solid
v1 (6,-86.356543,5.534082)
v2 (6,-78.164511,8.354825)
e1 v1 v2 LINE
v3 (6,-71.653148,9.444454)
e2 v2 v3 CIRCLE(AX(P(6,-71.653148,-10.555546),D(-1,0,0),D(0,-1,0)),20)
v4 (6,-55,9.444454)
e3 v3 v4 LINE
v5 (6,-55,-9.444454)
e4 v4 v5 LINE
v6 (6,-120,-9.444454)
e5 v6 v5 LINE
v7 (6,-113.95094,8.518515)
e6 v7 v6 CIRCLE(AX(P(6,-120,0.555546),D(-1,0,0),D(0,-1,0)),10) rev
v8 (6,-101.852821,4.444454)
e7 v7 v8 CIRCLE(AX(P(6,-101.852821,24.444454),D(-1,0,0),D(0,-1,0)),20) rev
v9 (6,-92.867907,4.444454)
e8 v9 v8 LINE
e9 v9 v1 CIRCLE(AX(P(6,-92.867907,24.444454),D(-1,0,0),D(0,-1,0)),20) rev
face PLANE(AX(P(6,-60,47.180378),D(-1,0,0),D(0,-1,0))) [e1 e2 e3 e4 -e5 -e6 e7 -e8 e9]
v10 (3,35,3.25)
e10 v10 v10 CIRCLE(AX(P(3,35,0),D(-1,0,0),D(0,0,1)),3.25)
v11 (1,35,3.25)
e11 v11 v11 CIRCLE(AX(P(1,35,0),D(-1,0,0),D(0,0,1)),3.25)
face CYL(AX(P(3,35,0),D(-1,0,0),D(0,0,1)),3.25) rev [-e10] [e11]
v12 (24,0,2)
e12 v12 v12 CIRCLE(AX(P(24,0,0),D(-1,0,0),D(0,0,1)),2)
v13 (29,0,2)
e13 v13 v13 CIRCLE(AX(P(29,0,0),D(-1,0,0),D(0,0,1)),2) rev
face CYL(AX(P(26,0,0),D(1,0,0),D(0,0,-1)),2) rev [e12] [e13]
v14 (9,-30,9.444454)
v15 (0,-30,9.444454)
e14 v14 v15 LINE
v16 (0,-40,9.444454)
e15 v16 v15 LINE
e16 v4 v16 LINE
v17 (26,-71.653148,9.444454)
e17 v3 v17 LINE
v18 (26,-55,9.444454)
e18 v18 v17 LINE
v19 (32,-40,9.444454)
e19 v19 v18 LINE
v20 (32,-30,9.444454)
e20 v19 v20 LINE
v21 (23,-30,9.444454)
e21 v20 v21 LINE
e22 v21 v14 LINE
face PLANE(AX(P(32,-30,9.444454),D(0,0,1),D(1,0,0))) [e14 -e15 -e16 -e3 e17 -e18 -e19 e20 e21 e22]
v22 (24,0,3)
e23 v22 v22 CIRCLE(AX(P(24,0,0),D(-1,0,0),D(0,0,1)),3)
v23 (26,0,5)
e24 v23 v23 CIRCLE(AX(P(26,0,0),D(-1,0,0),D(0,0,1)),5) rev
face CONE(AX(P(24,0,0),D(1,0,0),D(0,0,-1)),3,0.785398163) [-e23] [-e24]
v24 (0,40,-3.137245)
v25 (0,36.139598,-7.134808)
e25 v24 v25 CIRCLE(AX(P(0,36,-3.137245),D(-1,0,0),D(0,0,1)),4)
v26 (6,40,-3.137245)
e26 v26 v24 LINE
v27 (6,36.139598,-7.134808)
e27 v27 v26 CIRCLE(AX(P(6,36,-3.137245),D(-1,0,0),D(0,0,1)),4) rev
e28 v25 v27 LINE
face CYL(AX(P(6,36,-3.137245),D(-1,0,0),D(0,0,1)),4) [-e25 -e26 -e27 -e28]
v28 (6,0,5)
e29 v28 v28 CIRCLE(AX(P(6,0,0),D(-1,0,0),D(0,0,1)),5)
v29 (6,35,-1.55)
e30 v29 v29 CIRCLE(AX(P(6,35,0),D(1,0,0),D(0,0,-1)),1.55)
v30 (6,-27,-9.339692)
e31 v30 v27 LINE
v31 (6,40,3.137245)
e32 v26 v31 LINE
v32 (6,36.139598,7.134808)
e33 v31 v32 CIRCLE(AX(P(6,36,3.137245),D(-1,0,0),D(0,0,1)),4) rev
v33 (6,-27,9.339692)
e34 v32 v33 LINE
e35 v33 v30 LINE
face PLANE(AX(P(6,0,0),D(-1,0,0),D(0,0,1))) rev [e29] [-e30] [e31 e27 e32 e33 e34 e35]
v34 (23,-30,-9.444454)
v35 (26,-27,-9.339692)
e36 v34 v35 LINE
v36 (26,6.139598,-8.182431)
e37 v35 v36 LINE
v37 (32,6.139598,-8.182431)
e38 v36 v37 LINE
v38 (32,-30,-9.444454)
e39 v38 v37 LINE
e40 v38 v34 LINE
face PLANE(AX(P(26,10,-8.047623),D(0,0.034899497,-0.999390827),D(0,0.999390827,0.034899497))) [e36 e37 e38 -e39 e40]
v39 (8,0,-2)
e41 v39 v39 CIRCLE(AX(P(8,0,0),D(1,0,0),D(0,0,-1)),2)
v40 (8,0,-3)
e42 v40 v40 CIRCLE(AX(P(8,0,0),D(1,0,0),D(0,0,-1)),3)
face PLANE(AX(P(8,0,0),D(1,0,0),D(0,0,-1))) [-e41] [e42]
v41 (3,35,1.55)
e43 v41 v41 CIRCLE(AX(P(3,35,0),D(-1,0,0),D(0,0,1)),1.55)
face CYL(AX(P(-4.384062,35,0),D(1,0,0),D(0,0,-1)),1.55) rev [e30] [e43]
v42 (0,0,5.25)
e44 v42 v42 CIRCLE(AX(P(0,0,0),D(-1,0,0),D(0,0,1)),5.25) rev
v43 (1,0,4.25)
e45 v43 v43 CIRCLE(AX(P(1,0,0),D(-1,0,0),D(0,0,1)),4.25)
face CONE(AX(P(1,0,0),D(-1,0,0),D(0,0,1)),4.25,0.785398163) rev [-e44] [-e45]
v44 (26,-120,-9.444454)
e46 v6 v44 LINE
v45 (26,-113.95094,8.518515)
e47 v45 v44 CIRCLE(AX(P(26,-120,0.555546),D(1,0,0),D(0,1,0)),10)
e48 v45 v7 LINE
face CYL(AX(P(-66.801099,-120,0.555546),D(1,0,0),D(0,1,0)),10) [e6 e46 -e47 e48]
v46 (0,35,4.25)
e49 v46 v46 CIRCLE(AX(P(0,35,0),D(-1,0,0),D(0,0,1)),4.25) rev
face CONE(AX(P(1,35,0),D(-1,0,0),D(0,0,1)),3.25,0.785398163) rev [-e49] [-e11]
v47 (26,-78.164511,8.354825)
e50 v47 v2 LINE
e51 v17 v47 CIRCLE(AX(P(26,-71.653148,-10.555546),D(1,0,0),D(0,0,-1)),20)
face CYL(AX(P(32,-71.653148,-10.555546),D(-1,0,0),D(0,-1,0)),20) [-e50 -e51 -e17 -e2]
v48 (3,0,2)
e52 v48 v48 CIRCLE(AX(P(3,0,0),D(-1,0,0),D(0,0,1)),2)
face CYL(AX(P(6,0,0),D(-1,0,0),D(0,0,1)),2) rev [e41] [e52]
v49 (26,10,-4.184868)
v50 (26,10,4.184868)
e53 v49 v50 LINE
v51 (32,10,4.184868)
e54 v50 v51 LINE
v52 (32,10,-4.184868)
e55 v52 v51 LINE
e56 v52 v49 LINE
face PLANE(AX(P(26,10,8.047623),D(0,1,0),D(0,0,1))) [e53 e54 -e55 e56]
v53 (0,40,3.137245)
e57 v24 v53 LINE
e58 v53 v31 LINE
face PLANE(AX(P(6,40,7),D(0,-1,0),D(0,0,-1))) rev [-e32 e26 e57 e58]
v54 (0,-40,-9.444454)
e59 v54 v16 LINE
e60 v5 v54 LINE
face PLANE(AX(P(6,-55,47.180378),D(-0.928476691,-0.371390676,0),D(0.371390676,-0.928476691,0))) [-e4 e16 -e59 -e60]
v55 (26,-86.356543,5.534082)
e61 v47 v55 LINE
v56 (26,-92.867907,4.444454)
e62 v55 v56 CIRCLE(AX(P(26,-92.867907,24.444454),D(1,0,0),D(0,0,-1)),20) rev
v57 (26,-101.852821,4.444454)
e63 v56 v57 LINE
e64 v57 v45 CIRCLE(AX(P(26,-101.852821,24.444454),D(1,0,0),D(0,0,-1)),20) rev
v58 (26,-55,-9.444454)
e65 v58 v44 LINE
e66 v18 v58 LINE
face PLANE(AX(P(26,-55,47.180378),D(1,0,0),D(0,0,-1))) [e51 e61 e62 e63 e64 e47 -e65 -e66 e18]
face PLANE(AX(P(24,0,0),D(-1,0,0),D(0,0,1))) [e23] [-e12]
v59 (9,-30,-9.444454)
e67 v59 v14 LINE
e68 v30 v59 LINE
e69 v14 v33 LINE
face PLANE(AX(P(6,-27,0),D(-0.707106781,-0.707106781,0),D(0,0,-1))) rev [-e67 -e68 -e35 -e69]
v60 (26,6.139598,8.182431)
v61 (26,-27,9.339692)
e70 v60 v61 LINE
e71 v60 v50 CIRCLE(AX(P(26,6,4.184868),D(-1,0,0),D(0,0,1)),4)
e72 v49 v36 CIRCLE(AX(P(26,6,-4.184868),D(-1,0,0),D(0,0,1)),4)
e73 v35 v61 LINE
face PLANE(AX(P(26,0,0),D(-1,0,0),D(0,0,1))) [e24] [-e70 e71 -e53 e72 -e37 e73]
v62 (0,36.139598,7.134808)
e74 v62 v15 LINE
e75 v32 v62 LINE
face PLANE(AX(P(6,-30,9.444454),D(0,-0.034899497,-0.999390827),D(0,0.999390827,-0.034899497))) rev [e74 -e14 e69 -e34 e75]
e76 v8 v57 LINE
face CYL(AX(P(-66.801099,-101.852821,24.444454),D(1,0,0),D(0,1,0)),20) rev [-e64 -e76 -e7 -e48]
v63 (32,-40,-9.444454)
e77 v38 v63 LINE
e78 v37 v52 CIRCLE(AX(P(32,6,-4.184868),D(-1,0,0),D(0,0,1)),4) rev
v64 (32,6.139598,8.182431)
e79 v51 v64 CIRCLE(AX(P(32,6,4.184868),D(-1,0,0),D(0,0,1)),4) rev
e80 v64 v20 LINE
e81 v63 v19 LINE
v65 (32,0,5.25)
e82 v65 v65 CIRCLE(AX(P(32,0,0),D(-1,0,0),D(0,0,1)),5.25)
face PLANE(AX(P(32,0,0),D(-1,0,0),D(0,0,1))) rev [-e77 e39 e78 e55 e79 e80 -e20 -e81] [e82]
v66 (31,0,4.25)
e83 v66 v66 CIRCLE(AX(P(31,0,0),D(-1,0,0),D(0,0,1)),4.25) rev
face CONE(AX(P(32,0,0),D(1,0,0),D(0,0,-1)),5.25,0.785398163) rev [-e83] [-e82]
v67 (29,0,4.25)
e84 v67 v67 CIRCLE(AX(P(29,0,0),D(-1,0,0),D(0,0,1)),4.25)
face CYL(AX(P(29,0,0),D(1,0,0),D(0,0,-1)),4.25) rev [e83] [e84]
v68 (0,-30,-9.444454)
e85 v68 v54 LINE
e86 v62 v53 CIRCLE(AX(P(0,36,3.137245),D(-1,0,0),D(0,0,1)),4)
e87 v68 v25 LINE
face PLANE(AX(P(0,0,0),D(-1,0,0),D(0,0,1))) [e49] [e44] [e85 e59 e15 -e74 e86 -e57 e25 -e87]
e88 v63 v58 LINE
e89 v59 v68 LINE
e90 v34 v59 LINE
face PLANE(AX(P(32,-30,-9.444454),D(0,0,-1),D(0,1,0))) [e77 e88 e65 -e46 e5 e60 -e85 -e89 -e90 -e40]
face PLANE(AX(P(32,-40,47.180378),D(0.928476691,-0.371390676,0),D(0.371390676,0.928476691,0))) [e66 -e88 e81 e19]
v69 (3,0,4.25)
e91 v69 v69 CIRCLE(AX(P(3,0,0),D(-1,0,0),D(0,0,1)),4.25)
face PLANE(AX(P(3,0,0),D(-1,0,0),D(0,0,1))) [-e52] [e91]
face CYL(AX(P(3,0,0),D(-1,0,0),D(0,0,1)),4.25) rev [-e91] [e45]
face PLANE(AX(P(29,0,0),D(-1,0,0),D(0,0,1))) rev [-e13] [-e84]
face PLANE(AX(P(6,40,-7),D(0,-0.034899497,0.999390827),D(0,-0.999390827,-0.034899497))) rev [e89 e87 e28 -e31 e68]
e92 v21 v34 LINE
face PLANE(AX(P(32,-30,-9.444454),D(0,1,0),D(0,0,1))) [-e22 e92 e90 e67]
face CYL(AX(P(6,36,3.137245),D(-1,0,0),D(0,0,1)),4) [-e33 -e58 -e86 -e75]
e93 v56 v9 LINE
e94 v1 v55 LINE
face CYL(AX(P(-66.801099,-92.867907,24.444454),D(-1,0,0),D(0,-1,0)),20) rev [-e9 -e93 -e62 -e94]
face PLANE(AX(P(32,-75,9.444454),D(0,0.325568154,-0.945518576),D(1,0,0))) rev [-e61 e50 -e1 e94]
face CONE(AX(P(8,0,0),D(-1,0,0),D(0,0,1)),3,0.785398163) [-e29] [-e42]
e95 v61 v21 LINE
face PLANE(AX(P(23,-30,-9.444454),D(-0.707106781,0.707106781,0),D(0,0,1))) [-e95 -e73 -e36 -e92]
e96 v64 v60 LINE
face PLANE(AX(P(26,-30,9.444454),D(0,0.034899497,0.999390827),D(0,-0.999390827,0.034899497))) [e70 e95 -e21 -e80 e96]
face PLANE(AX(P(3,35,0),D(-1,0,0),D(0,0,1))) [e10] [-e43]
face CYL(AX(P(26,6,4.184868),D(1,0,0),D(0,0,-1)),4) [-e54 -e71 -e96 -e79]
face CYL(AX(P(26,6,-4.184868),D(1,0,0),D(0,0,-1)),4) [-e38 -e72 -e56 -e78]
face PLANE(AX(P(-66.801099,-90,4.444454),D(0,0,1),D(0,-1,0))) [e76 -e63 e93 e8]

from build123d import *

# Parameters (mm, degrees)
SKETCH1_R           = 2
BOSS_EXTRUDE1_DEPTH = 6
SKETCH2_R           = 4.25
CUT_EXTRUDE1_DEPTH  = 3
SKETCH3_W           = 18.888907728
SKETCH3_H           = 10
BOSS_EXTRUDE2_DEPTH = 32
BOSS_EXTRUDE3_START = -6
SKETCH4_R           = 2
BOSS_EXTRUDE3_DEPTH = 6
FILLET1_R           = 4
CUT_EXTRUDE2_START  = -29
SKETCH2_2_R         = 4.25
CUT_EXTRUDE2_DEPTH  = 3
CHAMFER1_SIZE       = 1
CHAMFER2_SIZE       = 3
SKETCH5_R           = 3
SKETCH5_R_2         = 2
BOSS_EXTRUDE4_DEPTH = 2
BOSS_EXTRUDE5_START = 18
SKETCH5_2_R         = 3
SKETCH5_2_R_2       = 2
BOSS_EXTRUDE5_DEPTH = 2
CHAMFER4_SIZE       = 2
BOSS_EXTRUDE6_DEPTH = 18.888907729
BOSS_EXTRUDE7_DEPTH = 20
CHAMFER5_SIZE       = 15
CHAMFER5_SIZE_2     = 5.164914199
FILLET2_R           = 20
SKETCH9_R           = 1.55
CUT_EXTRUDE3_DEPTH  = 6
CUT_EXTRUDE4_START  = -3
SKETCH10_R          = 3.25
SKETCH10_R_2        = 1.55
CUT_EXTRUDE4_DEPTH  = 3
CHAMFER6_SIZE       = 1


# Some blends are built 0.0001 mm under size
with BuildPart() as part:
    # Sketch1 → Boss-Extrude1 (new body)
    with BuildSketch(Plane(origin=(0, 0, 0), x_dir=(0, 0, -1), z_dir=(1, 0, 0))):
        Polygon((-9.444453864, -30), (-7, 40), (7, 40), (9.444453864, -30), align=None)
        Circle(SKETCH1_R, mode=Mode.SUBTRACT)
    extrude(amount=BOSS_EXTRUDE1_DEPTH)

    # Sketch2 → Cut-Extrude1 (cut)
    with BuildSketch(Plane.ZY):
        Circle(SKETCH2_R)
    extrude(amount=-CUT_EXTRUDE1_DEPTH, mode=Mode.SUBTRACT)

    # Sketch3 → Boss-Extrude2 (add)
    with BuildSketch(Plane.ZY):
        with Locations((0, -35)):
            Rectangle(SKETCH3_W, SKETCH3_H)
    extrude(amount=-BOSS_EXTRUDE2_DEPTH)

    # Sketch4 → Boss-Extrude3 (add)
    with BuildSketch(Plane(origin=(32, 0, 0), x_dir=(0, 0, -1), z_dir=(1, 0, 0)).offset(BOSS_EXTRUDE3_START)):
        Polygon((9.444453864, -30), (-9.444453864, -30), (-8.047623085, 10), (8.047623085, 10), align=None)
        with Locations(Location((0, 0, 0), (0, 0, 180))):
            Circle(SKETCH4_R, mode=Mode.SUBTRACT)
    extrude(amount=BOSS_EXTRUDE3_DEPTH)

    # Fillet1
    fillet1_edges = [part.edges().sort_by_distance(p)[0] for p in [
        (29, 10, -8.047623085),
        (29, 10, 8.047623085),
        (3, 40, 7),
        (3, 40, -7),
    ]]
    fillet(fillet1_edges, radius=FILLET1_R)

    # Sketch2<2> → Cut-Extrude2 (cut)
    with BuildSketch(Plane.ZY.offset(CUT_EXTRUDE2_START)):
        Circle(SKETCH2_2_R)
    extrude(amount=-CUT_EXTRUDE2_DEPTH, mode=Mode.SUBTRACT)

    # Chamfer1
    chamfer1_edges = [part.edges().sort_by_distance(p)[0] for p in [
        (0, 0, -4.25),
        (32, 0, -4.25),
    ]]
    chamfer(chamfer1_edges, length=CHAMFER1_SIZE)

    # Chamfer2
    chamfer2_edges = [part.edges().sort_by_distance(p)[0] for p in [
        (26, -30, 0),
        (6, -30, 0),
    ]]
    chamfer(chamfer2_edges, length=CHAMFER2_SIZE)

    # Sketch5 → Boss-Extrude4 (add)
    with BuildSketch(Plane(origin=(6, 0, 0), x_dir=(0, 0, -1), z_dir=(1, 0, 0))):
        with Locations(Location((0, 0, 0), (0, 0, 180))):
            Circle(SKETCH5_R)
        with Locations(Location((0, 0, 0), (0, 0, 180))):
            Circle(SKETCH5_R_2, mode=Mode.SUBTRACT)
    extrude(amount=BOSS_EXTRUDE4_DEPTH)

    # Sketch5<2> → Boss-Extrude5 (add)
    with BuildSketch(Plane(origin=(6, 0, 0), x_dir=(0, 0, -1), z_dir=(1, 0, 0)).offset(BOSS_EXTRUDE5_START)):
        with Locations(Location((0, 0, 0), (0, 0, 180))):
            Circle(SKETCH5_2_R)
        with Locations(Location((0, 0, 0), (0, 0, 180))):
            Circle(SKETCH5_2_R_2, mode=Mode.SUBTRACT)
    extrude(amount=BOSS_EXTRUDE5_DEPTH)

    # Chamfer4
    chamfer4_edges = [part.edges().sort_by_distance(p)[0] for p in [
        (6, 0, -3),
        (26, 0, -3),
    ]]
    chamfer(chamfer4_edges, length=CHAMFER4_SIZE - 0.0001)  # a hair under: the kernel refuses the full size

    # Sketch7 → Boss-Extrude6 (add)
    with BuildSketch(Plane(origin=(0, 0, -9.444453864), x_dir=(-1, 0, 0), z_dir=(0, 0, -1))):
        Polygon((-32, -40), (-26, -55), (-26, -60), (-6, -60), (-6, -55), (0, -40), align=None)
    extrude(amount=-BOSS_EXTRUDE6_DEPTH)

    # Sketch8 → Boss-Extrude7 (add)
    with BuildSketch(Plane(origin=(26, 0, 0), x_dir=(0, 0, -1), z_dir=(1, 0, 0))):
        with BuildLine():
            Line((9.444453864, -60), (-9.444453864, -60))
            Line((-9.444453864, -60), (-9.444453864, -90))
            Line((-9.444453864, -90), (-4.444453864, -90))
            Line((-4.444453864, -90), (-4.444453864, -110.787161313))
            ThreePointArc((-4.444453864, -110.787161313), (-6.083245599, -128.333338985), (9.444453864, -120))
            Line((9.444453864, -120), (9.444453864, -60))
        make_face()
    extrude(amount=-BOSS_EXTRUDE7_DEPTH)

    # Chamfer5
    # the kernel refuses this chamfer: 15, 5.164914199 mm, written as the material it takes off along each edge
    with BuildSketch(Plane(origin=(64.9213417, -90, 9.444453864), x_dir=(0, 0.9999212813122312, 0.012547158200392249), z_dir=(-1, 0, 0))) as chamfer5_piece_1_section:
        Polygon((CHAMFER5_SIZE * 0.999921281312, CHAMFER5_SIZE * 0.0125471582004), (-CHAMFER5_SIZE_2 * 0.0125471582012, CHAMFER5_SIZE_2 * 0.999921281379), (0, 0), align=None)
    chamfer5_piece_1 = extrude(amount=97.842683401, mode=Mode.PRIVATE)
    chamfer5_piece_1 = split(chamfer5_piece_1, bisect_by=Plane(origin=(16, -84.819367326, 4.444453864), z_dir=(0, 0, 1)), keep=Keep.TOP, mode=Mode.PRIVATE)
    add(chamfer5_piece_1, mode=Mode.SUBTRACT)

    # Fillet2
    fillet2_edges = [part.edges().sort_by_distance(p)[0] for p in [
        (16, -110.787161313, 4.444453864),
        (16, -75, 9.444453864),
        (16, -89.521054388, 4.444453864),
    ]]
    fillet(fillet2_edges, radius=FILLET2_R)

    # Sketch9 → Cut-Extrude3 (cut)
    with BuildSketch(Plane(origin=(6, 0, 0), x_dir=(0, 0, -1), z_dir=(1, 0, 0))):
        with Locations((0, 35)):
            Circle(SKETCH9_R)
    extrude(amount=-CUT_EXTRUDE3_DEPTH, mode=Mode.SUBTRACT)

    # Sketch10 → Cut-Extrude4 (cut)
    with BuildSketch(Plane.ZY.offset(CUT_EXTRUDE4_START)):
        with Locations((0, 35)):
            Circle(SKETCH10_R)
        with Locations(Location((0, 35, 0), (0, 0, 180))):
            Circle(SKETCH10_R_2, mode=Mode.SUBTRACT)
    extrude(amount=CUT_EXTRUDE4_DEPTH, mode=Mode.SUBTRACT)

    # Chamfer6
    chamfer6_edges = [part.edges().sort_by_distance(p)[0] for p in [
        (0, 35, -3.25),
    ]]
    chamfer(chamfer6_edges, length=CHAMFER6_SIZE)


solid = part.part
